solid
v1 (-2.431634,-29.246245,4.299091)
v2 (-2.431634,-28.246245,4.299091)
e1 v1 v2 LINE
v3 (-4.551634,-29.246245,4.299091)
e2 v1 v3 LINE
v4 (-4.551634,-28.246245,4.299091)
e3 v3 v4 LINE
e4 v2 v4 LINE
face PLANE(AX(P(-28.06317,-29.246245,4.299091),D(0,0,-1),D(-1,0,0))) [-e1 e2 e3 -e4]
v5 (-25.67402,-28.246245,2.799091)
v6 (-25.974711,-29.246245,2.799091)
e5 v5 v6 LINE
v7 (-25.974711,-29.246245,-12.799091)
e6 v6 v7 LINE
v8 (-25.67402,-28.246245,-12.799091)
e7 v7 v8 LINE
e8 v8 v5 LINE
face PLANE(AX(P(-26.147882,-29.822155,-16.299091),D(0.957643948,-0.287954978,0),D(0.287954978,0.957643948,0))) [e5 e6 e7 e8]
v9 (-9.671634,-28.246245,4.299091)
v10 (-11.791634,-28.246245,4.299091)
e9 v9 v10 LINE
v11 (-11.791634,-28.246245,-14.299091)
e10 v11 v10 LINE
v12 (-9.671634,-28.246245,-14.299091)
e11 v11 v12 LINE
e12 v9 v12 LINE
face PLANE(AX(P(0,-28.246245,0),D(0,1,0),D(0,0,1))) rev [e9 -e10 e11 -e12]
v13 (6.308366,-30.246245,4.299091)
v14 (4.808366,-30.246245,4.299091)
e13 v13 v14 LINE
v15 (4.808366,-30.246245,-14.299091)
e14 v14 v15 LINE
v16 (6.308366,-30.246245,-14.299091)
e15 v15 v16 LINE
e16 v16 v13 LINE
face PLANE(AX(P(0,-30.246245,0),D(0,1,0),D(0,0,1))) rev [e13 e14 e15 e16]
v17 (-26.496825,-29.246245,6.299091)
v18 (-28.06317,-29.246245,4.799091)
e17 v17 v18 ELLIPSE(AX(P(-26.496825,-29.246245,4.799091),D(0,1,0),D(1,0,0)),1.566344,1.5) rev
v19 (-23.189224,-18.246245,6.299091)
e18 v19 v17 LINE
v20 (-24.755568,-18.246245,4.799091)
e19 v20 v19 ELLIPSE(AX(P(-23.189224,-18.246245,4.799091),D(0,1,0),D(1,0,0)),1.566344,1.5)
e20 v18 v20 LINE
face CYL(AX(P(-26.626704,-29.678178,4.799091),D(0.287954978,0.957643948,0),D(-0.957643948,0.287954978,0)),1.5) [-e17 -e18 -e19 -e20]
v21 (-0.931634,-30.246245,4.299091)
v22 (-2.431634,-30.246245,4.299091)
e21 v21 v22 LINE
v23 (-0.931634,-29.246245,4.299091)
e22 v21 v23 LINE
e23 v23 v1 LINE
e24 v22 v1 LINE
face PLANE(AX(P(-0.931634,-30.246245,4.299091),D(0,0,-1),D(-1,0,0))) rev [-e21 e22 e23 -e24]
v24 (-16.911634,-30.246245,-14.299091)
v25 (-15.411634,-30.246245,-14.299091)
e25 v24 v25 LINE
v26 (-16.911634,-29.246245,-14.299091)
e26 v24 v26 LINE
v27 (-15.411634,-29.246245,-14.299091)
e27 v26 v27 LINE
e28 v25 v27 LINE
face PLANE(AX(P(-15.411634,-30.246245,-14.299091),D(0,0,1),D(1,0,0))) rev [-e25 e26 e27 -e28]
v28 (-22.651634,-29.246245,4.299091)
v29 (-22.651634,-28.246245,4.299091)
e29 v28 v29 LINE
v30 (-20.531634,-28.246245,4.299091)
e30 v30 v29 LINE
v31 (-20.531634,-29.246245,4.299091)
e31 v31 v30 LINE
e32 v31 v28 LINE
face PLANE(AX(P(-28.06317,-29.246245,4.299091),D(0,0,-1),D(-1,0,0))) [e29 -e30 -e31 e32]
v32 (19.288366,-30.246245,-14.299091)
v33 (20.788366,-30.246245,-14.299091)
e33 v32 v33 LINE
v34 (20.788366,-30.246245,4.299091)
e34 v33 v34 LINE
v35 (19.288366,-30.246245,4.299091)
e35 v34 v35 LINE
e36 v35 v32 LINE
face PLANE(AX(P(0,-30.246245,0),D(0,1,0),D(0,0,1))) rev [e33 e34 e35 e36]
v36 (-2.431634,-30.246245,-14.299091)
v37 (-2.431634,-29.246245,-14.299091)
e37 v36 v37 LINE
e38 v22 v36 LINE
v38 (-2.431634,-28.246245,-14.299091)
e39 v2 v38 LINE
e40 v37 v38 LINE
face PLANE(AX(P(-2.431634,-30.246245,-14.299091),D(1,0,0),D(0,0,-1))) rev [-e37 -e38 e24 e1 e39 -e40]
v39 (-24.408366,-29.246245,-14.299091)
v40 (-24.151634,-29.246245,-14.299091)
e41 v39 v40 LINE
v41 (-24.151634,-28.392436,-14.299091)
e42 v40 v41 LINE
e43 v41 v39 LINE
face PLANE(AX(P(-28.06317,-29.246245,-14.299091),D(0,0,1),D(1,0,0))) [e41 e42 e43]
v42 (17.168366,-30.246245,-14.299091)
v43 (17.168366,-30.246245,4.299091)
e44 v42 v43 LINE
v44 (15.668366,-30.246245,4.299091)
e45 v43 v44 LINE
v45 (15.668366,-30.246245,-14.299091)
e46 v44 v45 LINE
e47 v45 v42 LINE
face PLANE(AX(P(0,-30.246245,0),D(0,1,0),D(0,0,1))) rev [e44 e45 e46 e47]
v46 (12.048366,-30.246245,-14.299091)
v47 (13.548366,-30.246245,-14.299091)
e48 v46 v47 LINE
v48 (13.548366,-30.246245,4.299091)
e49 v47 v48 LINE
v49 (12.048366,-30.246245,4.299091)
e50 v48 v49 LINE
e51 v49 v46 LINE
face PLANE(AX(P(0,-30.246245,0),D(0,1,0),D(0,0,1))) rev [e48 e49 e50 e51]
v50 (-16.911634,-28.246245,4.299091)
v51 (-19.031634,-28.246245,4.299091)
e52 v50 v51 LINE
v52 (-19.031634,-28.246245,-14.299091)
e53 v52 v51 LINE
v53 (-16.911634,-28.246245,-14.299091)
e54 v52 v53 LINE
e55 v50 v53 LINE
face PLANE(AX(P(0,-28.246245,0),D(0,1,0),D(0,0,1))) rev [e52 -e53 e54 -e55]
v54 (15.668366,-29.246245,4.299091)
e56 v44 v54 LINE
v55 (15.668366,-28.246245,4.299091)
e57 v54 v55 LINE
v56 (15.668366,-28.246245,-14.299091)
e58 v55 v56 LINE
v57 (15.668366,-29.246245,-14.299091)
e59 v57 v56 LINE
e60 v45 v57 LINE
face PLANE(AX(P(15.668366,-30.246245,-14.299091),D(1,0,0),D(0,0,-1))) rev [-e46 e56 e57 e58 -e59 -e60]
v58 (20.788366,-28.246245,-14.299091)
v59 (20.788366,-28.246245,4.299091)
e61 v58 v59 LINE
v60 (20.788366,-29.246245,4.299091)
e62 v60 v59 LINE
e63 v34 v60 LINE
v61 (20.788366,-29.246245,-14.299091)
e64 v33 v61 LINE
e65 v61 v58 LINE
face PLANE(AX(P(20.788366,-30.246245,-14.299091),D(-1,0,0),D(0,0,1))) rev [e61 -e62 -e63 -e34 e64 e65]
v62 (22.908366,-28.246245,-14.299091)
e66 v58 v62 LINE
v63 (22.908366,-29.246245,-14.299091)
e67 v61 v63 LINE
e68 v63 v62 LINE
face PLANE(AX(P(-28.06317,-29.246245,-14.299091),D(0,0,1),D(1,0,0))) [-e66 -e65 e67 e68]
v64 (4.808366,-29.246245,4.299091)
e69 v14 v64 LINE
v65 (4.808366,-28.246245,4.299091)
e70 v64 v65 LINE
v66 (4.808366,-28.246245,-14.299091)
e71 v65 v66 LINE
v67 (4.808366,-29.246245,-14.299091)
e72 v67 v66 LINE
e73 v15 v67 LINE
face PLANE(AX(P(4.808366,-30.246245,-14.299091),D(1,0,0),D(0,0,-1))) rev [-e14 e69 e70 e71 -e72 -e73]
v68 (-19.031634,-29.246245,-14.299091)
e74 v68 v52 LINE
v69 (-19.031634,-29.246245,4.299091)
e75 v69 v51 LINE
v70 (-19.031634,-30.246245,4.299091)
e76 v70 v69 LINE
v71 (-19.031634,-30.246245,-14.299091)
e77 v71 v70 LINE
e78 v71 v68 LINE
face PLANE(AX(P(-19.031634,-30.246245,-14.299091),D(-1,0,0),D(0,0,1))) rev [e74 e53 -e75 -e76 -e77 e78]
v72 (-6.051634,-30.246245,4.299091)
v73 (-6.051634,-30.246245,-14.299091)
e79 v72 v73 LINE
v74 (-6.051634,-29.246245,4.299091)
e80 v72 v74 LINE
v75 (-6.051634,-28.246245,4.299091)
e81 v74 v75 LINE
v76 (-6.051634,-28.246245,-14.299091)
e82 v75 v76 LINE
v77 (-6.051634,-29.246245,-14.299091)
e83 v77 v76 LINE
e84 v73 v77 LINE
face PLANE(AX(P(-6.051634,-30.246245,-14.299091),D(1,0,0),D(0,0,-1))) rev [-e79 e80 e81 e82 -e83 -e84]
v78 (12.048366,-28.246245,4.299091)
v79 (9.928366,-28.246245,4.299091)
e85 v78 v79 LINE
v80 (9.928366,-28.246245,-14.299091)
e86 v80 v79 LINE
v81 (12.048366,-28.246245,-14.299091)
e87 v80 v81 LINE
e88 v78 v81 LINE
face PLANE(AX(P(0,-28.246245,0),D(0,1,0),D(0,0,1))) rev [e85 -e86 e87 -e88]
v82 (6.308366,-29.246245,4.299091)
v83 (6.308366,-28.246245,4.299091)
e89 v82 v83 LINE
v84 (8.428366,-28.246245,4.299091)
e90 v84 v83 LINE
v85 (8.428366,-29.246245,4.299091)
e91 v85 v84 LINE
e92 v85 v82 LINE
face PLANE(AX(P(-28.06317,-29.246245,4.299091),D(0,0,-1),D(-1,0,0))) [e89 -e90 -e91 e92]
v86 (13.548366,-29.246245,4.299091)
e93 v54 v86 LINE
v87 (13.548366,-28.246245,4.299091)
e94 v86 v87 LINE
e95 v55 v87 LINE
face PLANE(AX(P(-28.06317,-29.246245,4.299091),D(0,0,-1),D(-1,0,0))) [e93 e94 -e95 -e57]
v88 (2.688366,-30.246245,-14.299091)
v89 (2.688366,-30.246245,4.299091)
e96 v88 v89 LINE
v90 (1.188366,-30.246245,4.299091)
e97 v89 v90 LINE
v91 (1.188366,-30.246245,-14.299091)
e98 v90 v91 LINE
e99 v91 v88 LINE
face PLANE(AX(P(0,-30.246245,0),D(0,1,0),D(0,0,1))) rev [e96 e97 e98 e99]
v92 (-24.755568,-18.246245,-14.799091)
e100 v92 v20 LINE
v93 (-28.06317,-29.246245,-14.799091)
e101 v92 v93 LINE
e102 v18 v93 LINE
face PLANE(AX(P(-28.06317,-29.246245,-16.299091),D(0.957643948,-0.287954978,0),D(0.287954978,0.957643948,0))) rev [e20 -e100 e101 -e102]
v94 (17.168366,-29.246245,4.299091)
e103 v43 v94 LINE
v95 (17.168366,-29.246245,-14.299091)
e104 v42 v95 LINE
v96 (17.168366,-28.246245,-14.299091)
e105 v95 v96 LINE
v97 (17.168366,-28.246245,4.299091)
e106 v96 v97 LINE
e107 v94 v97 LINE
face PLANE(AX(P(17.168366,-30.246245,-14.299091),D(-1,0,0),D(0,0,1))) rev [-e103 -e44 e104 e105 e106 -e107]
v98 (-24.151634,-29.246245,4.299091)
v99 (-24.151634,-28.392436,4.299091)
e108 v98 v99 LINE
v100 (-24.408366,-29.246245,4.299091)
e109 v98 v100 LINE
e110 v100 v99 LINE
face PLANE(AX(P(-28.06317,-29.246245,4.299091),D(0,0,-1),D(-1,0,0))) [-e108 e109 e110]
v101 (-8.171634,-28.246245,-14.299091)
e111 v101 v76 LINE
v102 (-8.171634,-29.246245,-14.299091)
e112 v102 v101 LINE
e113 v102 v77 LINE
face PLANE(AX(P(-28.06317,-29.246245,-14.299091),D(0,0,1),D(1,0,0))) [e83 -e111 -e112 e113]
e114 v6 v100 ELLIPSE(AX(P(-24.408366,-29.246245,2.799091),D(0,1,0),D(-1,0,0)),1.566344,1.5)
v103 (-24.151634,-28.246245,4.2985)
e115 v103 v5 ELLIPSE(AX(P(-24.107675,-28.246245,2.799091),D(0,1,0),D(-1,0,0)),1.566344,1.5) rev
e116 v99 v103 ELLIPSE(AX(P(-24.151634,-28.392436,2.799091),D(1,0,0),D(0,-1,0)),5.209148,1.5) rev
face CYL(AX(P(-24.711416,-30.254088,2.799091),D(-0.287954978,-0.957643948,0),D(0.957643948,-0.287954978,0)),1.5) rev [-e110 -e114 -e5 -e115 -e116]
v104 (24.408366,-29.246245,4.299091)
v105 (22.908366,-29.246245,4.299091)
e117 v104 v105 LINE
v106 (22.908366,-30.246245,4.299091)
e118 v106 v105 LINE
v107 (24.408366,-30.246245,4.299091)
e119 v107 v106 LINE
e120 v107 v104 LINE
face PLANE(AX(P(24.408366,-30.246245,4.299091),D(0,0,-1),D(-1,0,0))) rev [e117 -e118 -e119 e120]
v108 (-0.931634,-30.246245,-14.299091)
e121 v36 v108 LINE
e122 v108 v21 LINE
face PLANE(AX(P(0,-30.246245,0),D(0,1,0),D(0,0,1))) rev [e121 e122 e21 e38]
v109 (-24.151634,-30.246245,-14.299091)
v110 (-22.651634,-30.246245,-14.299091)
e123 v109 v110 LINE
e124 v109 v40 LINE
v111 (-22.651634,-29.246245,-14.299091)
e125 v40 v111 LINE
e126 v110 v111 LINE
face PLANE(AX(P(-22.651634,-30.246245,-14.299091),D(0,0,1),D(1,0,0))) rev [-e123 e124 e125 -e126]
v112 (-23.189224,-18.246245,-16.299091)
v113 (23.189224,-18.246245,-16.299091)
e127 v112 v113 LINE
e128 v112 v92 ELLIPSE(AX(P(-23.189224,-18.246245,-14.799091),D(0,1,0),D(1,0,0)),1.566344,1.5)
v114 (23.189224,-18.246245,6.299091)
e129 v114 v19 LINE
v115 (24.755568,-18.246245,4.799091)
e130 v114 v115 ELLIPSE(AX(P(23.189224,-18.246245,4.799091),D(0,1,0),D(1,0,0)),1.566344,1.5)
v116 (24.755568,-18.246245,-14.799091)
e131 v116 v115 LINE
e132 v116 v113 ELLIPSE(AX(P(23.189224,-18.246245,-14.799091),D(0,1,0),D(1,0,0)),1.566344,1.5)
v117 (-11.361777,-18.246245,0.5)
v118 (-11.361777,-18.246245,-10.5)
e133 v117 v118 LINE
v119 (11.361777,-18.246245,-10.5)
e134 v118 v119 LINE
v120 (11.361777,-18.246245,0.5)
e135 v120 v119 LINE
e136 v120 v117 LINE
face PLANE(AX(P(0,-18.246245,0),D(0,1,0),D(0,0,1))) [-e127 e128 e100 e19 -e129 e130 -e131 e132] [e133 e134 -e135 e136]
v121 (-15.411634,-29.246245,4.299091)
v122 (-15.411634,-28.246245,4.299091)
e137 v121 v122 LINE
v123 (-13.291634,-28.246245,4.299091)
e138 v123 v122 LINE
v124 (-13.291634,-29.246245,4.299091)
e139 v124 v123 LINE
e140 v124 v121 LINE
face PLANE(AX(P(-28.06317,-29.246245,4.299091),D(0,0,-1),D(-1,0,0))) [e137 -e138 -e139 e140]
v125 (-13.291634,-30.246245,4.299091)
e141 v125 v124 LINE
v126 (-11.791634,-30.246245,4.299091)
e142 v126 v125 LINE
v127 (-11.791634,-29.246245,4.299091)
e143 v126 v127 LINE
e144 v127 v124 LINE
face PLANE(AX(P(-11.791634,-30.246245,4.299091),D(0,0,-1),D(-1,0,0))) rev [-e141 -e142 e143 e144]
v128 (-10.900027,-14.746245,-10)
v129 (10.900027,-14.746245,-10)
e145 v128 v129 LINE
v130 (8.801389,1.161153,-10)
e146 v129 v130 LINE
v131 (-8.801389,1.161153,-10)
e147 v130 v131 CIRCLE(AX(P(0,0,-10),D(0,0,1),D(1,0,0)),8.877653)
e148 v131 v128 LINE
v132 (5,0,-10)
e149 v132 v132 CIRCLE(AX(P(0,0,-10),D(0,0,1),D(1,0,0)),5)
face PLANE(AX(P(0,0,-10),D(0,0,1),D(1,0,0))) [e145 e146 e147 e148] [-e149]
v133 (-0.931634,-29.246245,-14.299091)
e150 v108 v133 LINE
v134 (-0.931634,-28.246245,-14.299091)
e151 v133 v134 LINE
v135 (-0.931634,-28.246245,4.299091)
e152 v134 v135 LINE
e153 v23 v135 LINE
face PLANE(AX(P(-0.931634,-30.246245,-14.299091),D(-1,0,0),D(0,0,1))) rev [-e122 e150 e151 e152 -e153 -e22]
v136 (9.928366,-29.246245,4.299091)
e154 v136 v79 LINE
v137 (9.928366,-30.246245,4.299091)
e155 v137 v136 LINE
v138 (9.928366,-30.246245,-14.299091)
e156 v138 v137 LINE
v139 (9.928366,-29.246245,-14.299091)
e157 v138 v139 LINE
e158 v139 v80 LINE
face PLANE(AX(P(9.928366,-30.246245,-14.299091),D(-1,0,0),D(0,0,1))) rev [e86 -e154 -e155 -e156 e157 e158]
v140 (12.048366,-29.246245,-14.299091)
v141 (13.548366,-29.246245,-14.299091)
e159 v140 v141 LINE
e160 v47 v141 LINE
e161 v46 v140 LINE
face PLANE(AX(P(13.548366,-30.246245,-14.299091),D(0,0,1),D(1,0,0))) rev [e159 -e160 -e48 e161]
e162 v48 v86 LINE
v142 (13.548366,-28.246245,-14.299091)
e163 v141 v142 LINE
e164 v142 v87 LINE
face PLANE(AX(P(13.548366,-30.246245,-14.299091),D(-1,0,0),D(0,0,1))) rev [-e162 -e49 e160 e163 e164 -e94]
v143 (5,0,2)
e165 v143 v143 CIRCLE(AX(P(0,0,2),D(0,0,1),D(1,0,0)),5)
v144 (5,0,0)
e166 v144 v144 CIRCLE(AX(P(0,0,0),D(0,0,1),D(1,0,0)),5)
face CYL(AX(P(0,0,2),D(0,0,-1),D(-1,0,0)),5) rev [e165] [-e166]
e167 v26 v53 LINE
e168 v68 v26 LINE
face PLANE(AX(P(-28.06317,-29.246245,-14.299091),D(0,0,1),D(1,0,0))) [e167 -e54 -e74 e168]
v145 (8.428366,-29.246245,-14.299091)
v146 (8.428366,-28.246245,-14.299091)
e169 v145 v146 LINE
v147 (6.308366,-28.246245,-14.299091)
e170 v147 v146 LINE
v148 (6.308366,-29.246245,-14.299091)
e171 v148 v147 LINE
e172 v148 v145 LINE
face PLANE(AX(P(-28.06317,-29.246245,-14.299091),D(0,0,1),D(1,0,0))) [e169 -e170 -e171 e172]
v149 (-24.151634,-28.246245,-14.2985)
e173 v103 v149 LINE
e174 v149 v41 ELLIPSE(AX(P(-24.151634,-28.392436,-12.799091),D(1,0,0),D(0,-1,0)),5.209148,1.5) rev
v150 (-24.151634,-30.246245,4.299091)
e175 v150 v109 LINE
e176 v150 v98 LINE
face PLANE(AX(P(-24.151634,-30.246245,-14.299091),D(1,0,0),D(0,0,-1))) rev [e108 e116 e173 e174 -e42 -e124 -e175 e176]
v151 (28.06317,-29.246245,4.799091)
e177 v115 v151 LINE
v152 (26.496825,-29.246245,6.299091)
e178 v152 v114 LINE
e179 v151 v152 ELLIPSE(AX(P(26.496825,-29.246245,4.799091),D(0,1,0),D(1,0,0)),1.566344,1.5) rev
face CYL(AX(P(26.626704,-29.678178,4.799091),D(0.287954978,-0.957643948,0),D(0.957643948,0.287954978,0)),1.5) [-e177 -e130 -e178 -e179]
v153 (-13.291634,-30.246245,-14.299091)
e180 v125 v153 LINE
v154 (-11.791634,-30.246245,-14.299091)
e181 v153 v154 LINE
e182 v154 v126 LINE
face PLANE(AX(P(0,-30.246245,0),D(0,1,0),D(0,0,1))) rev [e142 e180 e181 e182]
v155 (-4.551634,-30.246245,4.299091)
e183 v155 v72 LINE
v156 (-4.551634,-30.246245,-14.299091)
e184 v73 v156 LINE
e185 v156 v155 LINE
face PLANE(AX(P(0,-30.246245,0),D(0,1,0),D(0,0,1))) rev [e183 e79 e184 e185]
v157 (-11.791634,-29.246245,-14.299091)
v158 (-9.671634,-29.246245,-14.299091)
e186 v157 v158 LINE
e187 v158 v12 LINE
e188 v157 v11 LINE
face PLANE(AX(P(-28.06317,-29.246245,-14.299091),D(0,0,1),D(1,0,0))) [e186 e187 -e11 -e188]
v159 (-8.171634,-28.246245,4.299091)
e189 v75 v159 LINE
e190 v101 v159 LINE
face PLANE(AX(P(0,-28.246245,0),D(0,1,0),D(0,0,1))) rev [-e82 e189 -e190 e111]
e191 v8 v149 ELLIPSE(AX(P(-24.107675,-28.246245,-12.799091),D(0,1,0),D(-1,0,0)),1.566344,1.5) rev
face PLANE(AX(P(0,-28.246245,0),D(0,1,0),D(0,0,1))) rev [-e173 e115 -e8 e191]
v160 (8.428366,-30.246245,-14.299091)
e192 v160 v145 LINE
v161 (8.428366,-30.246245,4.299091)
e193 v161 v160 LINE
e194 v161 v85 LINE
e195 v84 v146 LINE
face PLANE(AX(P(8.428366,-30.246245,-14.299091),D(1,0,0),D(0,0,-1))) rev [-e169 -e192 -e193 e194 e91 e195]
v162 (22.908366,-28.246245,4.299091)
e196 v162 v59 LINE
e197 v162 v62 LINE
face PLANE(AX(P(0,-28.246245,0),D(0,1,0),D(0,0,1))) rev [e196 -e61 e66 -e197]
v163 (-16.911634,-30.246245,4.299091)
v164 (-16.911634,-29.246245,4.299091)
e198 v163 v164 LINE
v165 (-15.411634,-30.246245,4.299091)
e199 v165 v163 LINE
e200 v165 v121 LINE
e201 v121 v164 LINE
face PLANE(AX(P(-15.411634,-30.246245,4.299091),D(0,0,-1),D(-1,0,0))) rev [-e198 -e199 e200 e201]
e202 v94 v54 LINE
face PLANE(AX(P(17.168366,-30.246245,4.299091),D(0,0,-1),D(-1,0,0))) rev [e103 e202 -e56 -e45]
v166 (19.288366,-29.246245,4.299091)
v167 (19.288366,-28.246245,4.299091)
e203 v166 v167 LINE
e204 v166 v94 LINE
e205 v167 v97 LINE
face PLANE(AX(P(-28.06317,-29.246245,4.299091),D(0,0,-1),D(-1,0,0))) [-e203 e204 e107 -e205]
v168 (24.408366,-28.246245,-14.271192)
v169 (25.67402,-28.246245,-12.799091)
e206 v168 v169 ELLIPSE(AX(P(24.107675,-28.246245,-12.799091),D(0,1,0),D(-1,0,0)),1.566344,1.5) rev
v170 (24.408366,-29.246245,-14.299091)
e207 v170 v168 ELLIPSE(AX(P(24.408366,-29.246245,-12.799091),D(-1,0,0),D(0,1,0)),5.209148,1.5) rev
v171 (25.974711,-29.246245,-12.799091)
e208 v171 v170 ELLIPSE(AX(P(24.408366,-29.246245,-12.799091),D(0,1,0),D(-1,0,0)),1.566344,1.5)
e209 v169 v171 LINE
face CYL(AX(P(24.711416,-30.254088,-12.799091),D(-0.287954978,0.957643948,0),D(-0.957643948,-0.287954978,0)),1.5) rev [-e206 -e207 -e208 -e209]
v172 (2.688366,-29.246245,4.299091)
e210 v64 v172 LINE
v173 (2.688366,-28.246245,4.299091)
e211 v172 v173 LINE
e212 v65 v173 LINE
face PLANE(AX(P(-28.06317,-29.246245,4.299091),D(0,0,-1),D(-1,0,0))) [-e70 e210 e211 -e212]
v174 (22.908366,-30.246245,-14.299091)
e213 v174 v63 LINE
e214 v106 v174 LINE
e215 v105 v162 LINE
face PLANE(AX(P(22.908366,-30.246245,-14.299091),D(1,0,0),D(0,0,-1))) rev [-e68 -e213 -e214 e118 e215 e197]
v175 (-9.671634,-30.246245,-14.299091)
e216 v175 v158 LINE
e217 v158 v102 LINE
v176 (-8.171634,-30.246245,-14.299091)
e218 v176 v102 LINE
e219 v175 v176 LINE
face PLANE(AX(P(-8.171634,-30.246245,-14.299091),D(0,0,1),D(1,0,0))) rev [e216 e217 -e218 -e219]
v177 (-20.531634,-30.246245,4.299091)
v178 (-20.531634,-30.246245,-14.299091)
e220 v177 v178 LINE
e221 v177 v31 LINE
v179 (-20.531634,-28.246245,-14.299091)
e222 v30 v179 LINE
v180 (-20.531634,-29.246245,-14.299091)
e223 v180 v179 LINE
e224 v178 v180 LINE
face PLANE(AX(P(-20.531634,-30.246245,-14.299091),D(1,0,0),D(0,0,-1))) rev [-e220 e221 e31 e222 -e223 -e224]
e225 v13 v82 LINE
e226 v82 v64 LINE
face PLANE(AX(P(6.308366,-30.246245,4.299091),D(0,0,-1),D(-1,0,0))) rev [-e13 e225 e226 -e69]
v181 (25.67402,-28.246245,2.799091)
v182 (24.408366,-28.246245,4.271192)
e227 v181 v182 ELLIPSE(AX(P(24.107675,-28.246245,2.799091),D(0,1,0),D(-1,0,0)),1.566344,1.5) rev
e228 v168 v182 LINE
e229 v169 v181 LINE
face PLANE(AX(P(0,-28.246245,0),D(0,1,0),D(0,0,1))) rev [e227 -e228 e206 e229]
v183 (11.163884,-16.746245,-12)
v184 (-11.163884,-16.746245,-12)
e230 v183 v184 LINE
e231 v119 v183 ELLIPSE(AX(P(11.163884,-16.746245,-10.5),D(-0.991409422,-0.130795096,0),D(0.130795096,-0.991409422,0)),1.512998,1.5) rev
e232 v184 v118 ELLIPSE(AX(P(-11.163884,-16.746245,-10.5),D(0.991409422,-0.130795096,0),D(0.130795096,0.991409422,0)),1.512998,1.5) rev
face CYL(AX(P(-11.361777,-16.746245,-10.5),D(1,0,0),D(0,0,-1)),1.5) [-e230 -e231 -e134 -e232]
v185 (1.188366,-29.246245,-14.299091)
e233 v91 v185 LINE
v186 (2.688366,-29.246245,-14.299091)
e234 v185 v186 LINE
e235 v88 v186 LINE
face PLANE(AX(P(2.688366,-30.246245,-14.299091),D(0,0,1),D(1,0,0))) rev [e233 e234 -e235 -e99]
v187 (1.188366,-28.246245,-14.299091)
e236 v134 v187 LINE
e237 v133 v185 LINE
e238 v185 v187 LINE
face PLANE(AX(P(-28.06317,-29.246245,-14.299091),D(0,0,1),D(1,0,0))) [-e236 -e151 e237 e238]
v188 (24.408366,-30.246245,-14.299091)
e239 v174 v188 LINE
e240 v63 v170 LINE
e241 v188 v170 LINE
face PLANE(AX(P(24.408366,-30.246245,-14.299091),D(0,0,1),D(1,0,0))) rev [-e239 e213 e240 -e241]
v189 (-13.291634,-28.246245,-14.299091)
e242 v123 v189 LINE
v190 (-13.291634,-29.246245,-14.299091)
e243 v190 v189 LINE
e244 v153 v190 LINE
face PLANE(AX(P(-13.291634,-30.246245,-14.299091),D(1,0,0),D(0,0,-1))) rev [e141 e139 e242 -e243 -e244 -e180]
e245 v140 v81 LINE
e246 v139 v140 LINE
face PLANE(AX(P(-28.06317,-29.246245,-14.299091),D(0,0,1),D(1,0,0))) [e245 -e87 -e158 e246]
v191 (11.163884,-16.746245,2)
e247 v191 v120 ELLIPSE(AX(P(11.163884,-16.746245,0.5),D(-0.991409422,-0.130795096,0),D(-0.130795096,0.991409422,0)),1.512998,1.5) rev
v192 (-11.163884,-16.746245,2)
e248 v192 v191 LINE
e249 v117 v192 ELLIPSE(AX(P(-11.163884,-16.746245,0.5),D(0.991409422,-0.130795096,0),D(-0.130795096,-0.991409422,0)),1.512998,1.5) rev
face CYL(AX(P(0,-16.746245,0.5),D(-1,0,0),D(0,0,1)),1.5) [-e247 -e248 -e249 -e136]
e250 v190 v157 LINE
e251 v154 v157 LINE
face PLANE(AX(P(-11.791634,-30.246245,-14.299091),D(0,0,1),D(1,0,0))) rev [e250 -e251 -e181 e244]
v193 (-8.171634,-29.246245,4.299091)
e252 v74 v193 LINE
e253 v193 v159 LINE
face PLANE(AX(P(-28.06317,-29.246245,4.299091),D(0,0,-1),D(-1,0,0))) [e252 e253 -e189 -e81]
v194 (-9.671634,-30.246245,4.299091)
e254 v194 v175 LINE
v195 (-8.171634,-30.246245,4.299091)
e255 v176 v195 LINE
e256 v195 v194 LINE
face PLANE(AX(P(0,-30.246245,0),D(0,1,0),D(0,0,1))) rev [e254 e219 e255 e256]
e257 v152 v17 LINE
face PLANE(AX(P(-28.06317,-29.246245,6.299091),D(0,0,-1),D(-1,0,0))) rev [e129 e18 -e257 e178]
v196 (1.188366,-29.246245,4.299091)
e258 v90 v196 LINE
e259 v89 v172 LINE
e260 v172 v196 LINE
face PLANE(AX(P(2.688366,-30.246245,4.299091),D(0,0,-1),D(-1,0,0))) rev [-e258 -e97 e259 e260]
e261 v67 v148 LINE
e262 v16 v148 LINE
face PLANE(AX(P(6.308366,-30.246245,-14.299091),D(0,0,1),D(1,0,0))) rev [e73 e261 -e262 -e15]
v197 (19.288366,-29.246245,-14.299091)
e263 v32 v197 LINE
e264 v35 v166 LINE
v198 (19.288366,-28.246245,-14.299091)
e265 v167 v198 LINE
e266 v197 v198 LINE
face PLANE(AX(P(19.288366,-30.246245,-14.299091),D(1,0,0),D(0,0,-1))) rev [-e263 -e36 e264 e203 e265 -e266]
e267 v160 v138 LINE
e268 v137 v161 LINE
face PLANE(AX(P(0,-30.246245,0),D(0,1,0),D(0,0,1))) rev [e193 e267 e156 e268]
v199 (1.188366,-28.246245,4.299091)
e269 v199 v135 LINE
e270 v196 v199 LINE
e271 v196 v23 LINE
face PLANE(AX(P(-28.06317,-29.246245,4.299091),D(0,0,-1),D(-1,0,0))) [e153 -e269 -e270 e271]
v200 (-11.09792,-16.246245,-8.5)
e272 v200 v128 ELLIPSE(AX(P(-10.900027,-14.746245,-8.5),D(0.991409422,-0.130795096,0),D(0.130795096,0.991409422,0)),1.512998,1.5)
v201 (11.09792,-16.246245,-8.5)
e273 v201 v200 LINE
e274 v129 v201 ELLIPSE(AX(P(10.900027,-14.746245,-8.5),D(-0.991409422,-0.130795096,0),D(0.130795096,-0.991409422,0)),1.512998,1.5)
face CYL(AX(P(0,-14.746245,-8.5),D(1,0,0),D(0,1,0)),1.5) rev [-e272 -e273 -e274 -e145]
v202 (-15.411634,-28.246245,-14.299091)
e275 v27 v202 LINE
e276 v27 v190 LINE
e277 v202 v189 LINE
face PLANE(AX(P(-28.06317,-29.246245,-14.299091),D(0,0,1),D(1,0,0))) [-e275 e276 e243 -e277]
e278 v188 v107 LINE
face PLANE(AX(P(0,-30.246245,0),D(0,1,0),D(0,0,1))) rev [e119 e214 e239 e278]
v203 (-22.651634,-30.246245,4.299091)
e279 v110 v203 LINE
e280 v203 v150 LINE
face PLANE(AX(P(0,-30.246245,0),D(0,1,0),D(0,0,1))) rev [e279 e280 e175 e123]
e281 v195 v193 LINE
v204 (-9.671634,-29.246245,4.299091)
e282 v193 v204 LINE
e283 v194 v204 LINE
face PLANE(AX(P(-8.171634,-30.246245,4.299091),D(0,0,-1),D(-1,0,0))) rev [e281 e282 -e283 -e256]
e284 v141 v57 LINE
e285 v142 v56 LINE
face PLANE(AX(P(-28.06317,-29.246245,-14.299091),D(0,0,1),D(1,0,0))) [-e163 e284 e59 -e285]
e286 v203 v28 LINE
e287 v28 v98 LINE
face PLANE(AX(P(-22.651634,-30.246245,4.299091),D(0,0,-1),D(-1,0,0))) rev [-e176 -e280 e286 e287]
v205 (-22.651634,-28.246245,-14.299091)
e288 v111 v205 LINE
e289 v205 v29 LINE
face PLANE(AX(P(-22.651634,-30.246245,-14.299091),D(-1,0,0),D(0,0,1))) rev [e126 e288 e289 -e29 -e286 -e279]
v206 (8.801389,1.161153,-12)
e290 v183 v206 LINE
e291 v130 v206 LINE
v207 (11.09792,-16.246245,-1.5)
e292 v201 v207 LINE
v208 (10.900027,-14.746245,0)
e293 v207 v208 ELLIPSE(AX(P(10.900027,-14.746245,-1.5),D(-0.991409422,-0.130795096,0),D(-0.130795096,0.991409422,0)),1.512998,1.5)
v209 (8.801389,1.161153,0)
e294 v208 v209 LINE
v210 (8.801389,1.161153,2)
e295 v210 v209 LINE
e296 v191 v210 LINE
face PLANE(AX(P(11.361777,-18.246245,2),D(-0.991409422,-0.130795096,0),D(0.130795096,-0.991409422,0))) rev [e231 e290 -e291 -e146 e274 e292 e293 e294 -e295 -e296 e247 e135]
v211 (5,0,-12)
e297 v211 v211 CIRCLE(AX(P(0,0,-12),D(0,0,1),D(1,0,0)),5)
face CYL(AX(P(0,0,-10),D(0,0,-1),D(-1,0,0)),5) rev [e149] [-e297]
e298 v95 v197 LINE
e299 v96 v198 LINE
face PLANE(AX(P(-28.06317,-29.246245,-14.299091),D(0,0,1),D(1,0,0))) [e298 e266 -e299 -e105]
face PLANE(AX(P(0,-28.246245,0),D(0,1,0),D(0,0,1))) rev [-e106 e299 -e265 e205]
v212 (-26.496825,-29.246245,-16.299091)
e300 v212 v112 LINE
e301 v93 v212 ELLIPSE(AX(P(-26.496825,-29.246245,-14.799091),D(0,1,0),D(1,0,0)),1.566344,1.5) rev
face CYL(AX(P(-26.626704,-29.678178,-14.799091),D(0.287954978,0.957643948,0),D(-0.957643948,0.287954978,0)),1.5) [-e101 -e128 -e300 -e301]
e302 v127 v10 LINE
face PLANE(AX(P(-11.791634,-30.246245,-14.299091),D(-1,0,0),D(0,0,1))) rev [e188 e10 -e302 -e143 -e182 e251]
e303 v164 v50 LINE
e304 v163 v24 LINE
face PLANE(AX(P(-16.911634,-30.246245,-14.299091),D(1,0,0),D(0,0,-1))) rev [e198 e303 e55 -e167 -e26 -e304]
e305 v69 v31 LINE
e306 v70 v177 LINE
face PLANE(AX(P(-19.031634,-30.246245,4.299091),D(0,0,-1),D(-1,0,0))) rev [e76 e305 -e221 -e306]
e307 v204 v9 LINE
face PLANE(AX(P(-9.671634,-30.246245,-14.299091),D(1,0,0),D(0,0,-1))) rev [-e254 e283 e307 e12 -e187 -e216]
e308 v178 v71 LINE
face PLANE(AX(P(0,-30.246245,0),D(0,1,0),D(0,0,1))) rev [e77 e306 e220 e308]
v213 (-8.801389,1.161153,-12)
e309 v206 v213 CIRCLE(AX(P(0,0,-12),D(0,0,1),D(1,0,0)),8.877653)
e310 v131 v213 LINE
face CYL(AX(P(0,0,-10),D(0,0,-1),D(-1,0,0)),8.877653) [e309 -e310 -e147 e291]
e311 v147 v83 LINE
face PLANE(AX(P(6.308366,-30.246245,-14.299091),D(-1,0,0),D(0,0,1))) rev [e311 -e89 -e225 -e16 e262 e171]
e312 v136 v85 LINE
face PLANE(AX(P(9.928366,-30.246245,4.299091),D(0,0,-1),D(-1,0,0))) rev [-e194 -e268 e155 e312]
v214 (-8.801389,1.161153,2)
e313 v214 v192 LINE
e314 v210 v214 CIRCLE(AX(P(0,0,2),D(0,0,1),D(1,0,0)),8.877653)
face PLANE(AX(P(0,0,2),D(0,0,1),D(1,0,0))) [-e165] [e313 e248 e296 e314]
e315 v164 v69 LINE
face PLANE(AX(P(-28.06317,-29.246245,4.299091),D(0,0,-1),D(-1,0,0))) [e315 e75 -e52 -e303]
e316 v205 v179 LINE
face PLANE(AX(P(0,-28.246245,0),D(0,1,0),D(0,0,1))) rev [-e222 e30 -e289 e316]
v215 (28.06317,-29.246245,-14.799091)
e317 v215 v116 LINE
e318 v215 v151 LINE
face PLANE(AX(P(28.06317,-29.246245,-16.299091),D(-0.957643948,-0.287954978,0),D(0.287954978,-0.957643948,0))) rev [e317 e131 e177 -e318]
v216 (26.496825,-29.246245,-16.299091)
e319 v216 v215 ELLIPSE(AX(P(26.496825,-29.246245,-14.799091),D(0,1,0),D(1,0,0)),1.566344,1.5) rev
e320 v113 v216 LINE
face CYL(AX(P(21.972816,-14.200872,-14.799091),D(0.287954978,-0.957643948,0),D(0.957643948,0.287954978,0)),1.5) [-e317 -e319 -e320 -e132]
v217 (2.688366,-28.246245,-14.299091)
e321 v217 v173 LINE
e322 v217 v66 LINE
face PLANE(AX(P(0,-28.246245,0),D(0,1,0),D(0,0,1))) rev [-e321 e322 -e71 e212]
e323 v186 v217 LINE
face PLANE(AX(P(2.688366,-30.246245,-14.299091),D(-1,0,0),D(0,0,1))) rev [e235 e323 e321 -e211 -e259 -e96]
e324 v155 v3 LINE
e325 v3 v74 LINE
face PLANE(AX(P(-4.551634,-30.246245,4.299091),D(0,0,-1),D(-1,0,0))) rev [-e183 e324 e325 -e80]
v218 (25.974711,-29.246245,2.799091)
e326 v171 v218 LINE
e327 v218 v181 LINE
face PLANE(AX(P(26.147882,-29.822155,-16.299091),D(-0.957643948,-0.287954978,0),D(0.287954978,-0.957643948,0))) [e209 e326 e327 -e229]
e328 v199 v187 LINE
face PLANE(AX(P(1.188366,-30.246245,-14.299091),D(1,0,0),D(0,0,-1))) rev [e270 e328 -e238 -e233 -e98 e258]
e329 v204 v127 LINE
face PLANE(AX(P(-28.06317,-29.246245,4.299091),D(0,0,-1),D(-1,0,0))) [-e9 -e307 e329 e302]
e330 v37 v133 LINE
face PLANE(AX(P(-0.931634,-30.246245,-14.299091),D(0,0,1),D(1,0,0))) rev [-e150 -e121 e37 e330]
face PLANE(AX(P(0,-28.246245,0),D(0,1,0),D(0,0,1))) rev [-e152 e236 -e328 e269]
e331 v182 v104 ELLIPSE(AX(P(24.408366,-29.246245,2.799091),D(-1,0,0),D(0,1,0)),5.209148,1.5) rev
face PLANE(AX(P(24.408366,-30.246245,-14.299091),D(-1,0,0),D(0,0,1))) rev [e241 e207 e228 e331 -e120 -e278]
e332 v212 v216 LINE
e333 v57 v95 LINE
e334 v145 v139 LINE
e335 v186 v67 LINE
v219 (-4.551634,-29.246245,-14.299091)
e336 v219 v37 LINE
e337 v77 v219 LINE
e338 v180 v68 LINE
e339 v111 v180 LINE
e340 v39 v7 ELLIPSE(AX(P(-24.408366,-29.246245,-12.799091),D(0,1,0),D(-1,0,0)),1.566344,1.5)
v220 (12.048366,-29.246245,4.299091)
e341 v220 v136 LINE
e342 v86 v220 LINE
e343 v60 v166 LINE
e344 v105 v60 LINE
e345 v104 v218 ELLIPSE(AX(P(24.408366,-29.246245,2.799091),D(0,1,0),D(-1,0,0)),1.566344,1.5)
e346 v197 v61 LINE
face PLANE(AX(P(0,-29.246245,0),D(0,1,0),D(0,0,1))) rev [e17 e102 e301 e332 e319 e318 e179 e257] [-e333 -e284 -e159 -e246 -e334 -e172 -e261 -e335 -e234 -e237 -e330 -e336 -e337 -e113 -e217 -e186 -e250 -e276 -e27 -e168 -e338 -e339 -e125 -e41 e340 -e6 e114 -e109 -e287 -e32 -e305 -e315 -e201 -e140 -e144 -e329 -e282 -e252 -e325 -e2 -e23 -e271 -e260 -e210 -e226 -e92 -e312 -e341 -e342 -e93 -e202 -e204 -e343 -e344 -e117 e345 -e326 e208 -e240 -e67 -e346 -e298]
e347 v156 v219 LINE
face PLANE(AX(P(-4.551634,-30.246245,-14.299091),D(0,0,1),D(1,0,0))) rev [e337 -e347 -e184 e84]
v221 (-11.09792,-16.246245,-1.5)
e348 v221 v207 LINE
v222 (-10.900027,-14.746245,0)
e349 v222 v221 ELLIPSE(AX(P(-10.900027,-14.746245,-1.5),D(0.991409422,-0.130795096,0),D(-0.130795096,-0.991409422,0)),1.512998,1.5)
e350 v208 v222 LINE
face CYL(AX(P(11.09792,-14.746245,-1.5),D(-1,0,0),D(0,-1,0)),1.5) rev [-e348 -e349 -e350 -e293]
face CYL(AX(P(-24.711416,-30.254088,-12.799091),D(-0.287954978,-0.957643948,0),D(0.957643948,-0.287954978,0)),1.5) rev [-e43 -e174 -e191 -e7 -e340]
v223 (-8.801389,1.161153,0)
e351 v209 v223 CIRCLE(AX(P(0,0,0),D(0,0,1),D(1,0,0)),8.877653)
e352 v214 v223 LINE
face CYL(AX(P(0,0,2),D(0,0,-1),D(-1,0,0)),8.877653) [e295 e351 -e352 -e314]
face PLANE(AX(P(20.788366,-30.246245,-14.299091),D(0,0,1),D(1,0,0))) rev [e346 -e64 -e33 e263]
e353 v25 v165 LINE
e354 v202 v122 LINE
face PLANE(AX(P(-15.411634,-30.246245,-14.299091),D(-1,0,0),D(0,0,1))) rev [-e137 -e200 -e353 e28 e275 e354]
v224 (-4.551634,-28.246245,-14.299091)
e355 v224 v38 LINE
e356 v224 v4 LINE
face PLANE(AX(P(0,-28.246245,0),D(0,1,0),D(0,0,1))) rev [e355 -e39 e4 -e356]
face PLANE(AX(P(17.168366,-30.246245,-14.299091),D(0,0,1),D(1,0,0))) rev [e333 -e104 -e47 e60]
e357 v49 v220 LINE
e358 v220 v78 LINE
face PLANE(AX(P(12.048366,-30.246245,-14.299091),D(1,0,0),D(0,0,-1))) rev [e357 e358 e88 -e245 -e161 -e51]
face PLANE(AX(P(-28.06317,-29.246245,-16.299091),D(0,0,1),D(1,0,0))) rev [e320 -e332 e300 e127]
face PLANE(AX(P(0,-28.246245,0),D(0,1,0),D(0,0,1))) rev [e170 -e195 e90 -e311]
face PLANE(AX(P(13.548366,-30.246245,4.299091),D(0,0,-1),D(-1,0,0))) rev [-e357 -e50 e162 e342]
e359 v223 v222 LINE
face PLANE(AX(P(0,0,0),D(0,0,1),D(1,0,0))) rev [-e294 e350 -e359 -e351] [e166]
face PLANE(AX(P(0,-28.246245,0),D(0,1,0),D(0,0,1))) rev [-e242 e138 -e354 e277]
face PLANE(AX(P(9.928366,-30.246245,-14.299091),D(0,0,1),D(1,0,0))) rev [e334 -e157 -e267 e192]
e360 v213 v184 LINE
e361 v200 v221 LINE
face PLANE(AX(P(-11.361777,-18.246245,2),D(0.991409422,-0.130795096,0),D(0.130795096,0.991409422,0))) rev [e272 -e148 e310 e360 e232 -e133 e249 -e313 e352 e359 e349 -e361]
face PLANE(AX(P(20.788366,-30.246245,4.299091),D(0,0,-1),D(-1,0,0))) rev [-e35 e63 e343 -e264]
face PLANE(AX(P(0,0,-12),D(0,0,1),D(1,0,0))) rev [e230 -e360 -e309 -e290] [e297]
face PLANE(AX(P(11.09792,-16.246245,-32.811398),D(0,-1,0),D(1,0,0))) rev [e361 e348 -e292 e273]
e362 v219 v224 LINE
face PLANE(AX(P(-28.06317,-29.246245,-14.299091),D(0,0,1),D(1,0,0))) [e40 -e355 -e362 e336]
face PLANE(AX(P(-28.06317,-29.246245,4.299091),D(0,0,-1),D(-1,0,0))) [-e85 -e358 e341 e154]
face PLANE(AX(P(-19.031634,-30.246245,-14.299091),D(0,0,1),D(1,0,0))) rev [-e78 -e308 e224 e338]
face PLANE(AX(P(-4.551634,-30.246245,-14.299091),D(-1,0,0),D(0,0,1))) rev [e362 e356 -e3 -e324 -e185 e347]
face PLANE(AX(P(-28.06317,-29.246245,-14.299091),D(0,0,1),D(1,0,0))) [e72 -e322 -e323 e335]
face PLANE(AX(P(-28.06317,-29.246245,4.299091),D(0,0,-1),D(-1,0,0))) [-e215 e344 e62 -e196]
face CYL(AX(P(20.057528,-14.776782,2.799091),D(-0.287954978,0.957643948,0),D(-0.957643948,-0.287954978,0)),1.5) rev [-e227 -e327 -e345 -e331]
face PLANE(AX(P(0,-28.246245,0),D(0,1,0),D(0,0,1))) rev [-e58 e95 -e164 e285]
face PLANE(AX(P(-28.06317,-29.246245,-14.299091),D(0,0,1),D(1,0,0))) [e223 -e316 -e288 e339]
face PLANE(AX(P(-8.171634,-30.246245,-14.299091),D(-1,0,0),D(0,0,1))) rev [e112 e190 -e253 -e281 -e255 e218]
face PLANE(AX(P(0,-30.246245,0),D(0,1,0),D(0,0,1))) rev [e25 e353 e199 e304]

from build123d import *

# Parameters (mm, degrees)
SKETCH1_R           = 5
BOSS_EXTRUDE1_DEPTH = 2
BOSS_EXTRUDE2_DEPTH = 10
LPATTERN1_COUNT     = 2
LPATTERN1_PITCH     = 12
FILLET1_R           = 1.5
SKETCH3_W           = 56.126339002
SKETCH3_H           = 22.59818153
BOSS_EXTRUDE3_DEPTH = 11
CUT_EXTRUDE1_DEPTH  = 47.406488284
SHELL1_START        = -14.299090765
SHELL1_DEPTH        = 18.59818153
FILLET2_R           = 1.5
SKETCH6_W           = 1.5
SKETCH6_H           = 18.59818153
BOSS_EXTRUDE4_DEPTH = 2


# Read off the part's stored shape, not the designer's step: Shell1
with BuildPart() as part:
    # Sketch1 → Boss-Extrude1 (new body)
    with BuildSketch(Plane.XY):
        with BuildLine():
            Line((-11.361776574, -18.246245298), (-8.801388784, 1.161153468))
            ThreePointArc((-8.801388784, 1.161153468), (0, 8.87765295), (8.801388784, 1.161153468))
            Line((8.801388784, 1.161153468), (11.361776574, -18.246245298))
            Line((11.361776574, -18.246245298), (-11.361776574, -18.246245298))
        make_face()
        Circle(SKETCH1_R, mode=Mode.SUBTRACT)
    boss_extrude1 = extrude(amount=BOSS_EXTRUDE1_DEPTH)

    # Sketch2 → Boss-Extrude2 (add)
    with BuildSketch(Plane(origin=(0, 0, 0), x_dir=(-1, 0, 0), z_dir=(0, 0, -1))):
        Polygon((-11.0979197, -16.246245298), (11.0979197, -16.246245298), (11.361776574, -18.246245298), (-11.361776574, -18.246245298), align=None)
    extrude(amount=BOSS_EXTRUDE2_DEPTH)

    # LPattern1: Boss-Extrude1 ×2
    with Locations(*[(0, 0, -i * LPATTERN1_PITCH) for i in range(1, LPATTERN1_COUNT)]):
        add(boss_extrude1)

    # Fillet1
    fillet1_edges = [part.edges().sort_by_distance(p)[0] for p in [
        (0, -18.246245298, -12),
        (0, -16.246245298, 0),
        (0, -16.246245298, -10),
        (0, -18.246245298, 2),
    ]]
    fillet(fillet1_edges, radius=FILLET1_R)

    # Sketch3 → Boss-Extrude3 (add)
    with BuildSketch(Plane.XZ.offset(18.246245298)):
        with Locations((0, -5)):
            Rectangle(SKETCH3_W, SKETCH3_H)
    extrude(amount=BOSS_EXTRUDE3_DEPTH)

    # Sketch5 → Cut-Extrude1 (cut, through all)
    with BuildSketch(Plane.XY.offset(6.299090765)):
        Polygon((-28.063169501, -29.246245298), (-24.755567795, -18.246245298), (-28.063169501, -18.246245298), align=None)
        Polygon((28.063169501, -18.246245298), (28.063169501, -29.246245298), (24.755567795, -18.246245298), align=None)
    extrude(amount=-CUT_EXTRUDE1_DEPTH, mode=Mode.SUBTRACT)

    # Shell1 outline → Shell1 (cut)
    with BuildSketch(Plane.XY.offset(SHELL1_START)):
        Polygon((25.974710628, -29.246245298), (25.674019564, -28.246245298), (-25.674019564, -28.246245298), (-25.974710628, -29.246245298), align=None)
    extrude(amount=SHELL1_DEPTH, mode=Mode.SUBTRACT)

    # Fillet2
    fillet2_edges = [part.edges().sort_by_distance(p)[0] for p in [
        (26.409368648, -23.746245298, -16.299090765),
        (26.409368648, -23.746245298, 6.299090765),
        (25.824365096, -28.746245298, -14.299090765),
        (-25.824365096, -28.746245298, -14.299090765),
        (-25.824365096, -28.746245298, 4.299090765),
        (25.824365096, -28.746245298, 4.299090765),
        (-26.409368648, -23.746245298, -16.299090765),
        (-26.409368648, -23.746245298, 6.299090765),
    ]]
    fillet(fillet2_edges, radius=FILLET2_R)

    # Sketch6 → Boss-Extrude4 (add)
    with BuildSketch(Plane.XZ.offset(28.246245298)):
        with Locations((23.658366473, -5)):
            Rectangle(SKETCH6_W, SKETCH6_H)
        with Locations((20.038366473, -5)):
            Rectangle(SKETCH6_W, SKETCH6_H)
        with Locations((16.418366473, -5)):
            Rectangle(SKETCH6_W, SKETCH6_H)
        with Locations((12.798366473, -5)):
            Rectangle(SKETCH6_W, SKETCH6_H)
        with Locations((9.178366473, -5)):
            Rectangle(SKETCH6_W, SKETCH6_H)
        with Locations((5.558366473, -5)):
            Rectangle(SKETCH6_W, SKETCH6_H)
        with Locations((1.938366473, -5)):
            Rectangle(SKETCH6_W, SKETCH6_H)
        with Locations((-1.681633527, -5)):
            Rectangle(SKETCH6_W, SKETCH6_H)
        with Locations((-5.301633527, -5)):
            Rectangle(SKETCH6_W, SKETCH6_H)
        with Locations((-8.921633527, -5)):
            Rectangle(SKETCH6_W, SKETCH6_H)
        with Locations((-12.541633527, -5)):
            Rectangle(SKETCH6_W, SKETCH6_H)
        with Locations((-16.161633527, -5)):
            Rectangle(SKETCH6_W, SKETCH6_H)
        with Locations((-19.781633527, -5)):
            Rectangle(SKETCH6_W, SKETCH6_H)
        with Locations((-23.401633527, -5)):
            Rectangle(SKETCH6_W, SKETCH6_H)
    extrude(amount=BOSS_EXTRUDE4_DEPTH)


solid = part.part
